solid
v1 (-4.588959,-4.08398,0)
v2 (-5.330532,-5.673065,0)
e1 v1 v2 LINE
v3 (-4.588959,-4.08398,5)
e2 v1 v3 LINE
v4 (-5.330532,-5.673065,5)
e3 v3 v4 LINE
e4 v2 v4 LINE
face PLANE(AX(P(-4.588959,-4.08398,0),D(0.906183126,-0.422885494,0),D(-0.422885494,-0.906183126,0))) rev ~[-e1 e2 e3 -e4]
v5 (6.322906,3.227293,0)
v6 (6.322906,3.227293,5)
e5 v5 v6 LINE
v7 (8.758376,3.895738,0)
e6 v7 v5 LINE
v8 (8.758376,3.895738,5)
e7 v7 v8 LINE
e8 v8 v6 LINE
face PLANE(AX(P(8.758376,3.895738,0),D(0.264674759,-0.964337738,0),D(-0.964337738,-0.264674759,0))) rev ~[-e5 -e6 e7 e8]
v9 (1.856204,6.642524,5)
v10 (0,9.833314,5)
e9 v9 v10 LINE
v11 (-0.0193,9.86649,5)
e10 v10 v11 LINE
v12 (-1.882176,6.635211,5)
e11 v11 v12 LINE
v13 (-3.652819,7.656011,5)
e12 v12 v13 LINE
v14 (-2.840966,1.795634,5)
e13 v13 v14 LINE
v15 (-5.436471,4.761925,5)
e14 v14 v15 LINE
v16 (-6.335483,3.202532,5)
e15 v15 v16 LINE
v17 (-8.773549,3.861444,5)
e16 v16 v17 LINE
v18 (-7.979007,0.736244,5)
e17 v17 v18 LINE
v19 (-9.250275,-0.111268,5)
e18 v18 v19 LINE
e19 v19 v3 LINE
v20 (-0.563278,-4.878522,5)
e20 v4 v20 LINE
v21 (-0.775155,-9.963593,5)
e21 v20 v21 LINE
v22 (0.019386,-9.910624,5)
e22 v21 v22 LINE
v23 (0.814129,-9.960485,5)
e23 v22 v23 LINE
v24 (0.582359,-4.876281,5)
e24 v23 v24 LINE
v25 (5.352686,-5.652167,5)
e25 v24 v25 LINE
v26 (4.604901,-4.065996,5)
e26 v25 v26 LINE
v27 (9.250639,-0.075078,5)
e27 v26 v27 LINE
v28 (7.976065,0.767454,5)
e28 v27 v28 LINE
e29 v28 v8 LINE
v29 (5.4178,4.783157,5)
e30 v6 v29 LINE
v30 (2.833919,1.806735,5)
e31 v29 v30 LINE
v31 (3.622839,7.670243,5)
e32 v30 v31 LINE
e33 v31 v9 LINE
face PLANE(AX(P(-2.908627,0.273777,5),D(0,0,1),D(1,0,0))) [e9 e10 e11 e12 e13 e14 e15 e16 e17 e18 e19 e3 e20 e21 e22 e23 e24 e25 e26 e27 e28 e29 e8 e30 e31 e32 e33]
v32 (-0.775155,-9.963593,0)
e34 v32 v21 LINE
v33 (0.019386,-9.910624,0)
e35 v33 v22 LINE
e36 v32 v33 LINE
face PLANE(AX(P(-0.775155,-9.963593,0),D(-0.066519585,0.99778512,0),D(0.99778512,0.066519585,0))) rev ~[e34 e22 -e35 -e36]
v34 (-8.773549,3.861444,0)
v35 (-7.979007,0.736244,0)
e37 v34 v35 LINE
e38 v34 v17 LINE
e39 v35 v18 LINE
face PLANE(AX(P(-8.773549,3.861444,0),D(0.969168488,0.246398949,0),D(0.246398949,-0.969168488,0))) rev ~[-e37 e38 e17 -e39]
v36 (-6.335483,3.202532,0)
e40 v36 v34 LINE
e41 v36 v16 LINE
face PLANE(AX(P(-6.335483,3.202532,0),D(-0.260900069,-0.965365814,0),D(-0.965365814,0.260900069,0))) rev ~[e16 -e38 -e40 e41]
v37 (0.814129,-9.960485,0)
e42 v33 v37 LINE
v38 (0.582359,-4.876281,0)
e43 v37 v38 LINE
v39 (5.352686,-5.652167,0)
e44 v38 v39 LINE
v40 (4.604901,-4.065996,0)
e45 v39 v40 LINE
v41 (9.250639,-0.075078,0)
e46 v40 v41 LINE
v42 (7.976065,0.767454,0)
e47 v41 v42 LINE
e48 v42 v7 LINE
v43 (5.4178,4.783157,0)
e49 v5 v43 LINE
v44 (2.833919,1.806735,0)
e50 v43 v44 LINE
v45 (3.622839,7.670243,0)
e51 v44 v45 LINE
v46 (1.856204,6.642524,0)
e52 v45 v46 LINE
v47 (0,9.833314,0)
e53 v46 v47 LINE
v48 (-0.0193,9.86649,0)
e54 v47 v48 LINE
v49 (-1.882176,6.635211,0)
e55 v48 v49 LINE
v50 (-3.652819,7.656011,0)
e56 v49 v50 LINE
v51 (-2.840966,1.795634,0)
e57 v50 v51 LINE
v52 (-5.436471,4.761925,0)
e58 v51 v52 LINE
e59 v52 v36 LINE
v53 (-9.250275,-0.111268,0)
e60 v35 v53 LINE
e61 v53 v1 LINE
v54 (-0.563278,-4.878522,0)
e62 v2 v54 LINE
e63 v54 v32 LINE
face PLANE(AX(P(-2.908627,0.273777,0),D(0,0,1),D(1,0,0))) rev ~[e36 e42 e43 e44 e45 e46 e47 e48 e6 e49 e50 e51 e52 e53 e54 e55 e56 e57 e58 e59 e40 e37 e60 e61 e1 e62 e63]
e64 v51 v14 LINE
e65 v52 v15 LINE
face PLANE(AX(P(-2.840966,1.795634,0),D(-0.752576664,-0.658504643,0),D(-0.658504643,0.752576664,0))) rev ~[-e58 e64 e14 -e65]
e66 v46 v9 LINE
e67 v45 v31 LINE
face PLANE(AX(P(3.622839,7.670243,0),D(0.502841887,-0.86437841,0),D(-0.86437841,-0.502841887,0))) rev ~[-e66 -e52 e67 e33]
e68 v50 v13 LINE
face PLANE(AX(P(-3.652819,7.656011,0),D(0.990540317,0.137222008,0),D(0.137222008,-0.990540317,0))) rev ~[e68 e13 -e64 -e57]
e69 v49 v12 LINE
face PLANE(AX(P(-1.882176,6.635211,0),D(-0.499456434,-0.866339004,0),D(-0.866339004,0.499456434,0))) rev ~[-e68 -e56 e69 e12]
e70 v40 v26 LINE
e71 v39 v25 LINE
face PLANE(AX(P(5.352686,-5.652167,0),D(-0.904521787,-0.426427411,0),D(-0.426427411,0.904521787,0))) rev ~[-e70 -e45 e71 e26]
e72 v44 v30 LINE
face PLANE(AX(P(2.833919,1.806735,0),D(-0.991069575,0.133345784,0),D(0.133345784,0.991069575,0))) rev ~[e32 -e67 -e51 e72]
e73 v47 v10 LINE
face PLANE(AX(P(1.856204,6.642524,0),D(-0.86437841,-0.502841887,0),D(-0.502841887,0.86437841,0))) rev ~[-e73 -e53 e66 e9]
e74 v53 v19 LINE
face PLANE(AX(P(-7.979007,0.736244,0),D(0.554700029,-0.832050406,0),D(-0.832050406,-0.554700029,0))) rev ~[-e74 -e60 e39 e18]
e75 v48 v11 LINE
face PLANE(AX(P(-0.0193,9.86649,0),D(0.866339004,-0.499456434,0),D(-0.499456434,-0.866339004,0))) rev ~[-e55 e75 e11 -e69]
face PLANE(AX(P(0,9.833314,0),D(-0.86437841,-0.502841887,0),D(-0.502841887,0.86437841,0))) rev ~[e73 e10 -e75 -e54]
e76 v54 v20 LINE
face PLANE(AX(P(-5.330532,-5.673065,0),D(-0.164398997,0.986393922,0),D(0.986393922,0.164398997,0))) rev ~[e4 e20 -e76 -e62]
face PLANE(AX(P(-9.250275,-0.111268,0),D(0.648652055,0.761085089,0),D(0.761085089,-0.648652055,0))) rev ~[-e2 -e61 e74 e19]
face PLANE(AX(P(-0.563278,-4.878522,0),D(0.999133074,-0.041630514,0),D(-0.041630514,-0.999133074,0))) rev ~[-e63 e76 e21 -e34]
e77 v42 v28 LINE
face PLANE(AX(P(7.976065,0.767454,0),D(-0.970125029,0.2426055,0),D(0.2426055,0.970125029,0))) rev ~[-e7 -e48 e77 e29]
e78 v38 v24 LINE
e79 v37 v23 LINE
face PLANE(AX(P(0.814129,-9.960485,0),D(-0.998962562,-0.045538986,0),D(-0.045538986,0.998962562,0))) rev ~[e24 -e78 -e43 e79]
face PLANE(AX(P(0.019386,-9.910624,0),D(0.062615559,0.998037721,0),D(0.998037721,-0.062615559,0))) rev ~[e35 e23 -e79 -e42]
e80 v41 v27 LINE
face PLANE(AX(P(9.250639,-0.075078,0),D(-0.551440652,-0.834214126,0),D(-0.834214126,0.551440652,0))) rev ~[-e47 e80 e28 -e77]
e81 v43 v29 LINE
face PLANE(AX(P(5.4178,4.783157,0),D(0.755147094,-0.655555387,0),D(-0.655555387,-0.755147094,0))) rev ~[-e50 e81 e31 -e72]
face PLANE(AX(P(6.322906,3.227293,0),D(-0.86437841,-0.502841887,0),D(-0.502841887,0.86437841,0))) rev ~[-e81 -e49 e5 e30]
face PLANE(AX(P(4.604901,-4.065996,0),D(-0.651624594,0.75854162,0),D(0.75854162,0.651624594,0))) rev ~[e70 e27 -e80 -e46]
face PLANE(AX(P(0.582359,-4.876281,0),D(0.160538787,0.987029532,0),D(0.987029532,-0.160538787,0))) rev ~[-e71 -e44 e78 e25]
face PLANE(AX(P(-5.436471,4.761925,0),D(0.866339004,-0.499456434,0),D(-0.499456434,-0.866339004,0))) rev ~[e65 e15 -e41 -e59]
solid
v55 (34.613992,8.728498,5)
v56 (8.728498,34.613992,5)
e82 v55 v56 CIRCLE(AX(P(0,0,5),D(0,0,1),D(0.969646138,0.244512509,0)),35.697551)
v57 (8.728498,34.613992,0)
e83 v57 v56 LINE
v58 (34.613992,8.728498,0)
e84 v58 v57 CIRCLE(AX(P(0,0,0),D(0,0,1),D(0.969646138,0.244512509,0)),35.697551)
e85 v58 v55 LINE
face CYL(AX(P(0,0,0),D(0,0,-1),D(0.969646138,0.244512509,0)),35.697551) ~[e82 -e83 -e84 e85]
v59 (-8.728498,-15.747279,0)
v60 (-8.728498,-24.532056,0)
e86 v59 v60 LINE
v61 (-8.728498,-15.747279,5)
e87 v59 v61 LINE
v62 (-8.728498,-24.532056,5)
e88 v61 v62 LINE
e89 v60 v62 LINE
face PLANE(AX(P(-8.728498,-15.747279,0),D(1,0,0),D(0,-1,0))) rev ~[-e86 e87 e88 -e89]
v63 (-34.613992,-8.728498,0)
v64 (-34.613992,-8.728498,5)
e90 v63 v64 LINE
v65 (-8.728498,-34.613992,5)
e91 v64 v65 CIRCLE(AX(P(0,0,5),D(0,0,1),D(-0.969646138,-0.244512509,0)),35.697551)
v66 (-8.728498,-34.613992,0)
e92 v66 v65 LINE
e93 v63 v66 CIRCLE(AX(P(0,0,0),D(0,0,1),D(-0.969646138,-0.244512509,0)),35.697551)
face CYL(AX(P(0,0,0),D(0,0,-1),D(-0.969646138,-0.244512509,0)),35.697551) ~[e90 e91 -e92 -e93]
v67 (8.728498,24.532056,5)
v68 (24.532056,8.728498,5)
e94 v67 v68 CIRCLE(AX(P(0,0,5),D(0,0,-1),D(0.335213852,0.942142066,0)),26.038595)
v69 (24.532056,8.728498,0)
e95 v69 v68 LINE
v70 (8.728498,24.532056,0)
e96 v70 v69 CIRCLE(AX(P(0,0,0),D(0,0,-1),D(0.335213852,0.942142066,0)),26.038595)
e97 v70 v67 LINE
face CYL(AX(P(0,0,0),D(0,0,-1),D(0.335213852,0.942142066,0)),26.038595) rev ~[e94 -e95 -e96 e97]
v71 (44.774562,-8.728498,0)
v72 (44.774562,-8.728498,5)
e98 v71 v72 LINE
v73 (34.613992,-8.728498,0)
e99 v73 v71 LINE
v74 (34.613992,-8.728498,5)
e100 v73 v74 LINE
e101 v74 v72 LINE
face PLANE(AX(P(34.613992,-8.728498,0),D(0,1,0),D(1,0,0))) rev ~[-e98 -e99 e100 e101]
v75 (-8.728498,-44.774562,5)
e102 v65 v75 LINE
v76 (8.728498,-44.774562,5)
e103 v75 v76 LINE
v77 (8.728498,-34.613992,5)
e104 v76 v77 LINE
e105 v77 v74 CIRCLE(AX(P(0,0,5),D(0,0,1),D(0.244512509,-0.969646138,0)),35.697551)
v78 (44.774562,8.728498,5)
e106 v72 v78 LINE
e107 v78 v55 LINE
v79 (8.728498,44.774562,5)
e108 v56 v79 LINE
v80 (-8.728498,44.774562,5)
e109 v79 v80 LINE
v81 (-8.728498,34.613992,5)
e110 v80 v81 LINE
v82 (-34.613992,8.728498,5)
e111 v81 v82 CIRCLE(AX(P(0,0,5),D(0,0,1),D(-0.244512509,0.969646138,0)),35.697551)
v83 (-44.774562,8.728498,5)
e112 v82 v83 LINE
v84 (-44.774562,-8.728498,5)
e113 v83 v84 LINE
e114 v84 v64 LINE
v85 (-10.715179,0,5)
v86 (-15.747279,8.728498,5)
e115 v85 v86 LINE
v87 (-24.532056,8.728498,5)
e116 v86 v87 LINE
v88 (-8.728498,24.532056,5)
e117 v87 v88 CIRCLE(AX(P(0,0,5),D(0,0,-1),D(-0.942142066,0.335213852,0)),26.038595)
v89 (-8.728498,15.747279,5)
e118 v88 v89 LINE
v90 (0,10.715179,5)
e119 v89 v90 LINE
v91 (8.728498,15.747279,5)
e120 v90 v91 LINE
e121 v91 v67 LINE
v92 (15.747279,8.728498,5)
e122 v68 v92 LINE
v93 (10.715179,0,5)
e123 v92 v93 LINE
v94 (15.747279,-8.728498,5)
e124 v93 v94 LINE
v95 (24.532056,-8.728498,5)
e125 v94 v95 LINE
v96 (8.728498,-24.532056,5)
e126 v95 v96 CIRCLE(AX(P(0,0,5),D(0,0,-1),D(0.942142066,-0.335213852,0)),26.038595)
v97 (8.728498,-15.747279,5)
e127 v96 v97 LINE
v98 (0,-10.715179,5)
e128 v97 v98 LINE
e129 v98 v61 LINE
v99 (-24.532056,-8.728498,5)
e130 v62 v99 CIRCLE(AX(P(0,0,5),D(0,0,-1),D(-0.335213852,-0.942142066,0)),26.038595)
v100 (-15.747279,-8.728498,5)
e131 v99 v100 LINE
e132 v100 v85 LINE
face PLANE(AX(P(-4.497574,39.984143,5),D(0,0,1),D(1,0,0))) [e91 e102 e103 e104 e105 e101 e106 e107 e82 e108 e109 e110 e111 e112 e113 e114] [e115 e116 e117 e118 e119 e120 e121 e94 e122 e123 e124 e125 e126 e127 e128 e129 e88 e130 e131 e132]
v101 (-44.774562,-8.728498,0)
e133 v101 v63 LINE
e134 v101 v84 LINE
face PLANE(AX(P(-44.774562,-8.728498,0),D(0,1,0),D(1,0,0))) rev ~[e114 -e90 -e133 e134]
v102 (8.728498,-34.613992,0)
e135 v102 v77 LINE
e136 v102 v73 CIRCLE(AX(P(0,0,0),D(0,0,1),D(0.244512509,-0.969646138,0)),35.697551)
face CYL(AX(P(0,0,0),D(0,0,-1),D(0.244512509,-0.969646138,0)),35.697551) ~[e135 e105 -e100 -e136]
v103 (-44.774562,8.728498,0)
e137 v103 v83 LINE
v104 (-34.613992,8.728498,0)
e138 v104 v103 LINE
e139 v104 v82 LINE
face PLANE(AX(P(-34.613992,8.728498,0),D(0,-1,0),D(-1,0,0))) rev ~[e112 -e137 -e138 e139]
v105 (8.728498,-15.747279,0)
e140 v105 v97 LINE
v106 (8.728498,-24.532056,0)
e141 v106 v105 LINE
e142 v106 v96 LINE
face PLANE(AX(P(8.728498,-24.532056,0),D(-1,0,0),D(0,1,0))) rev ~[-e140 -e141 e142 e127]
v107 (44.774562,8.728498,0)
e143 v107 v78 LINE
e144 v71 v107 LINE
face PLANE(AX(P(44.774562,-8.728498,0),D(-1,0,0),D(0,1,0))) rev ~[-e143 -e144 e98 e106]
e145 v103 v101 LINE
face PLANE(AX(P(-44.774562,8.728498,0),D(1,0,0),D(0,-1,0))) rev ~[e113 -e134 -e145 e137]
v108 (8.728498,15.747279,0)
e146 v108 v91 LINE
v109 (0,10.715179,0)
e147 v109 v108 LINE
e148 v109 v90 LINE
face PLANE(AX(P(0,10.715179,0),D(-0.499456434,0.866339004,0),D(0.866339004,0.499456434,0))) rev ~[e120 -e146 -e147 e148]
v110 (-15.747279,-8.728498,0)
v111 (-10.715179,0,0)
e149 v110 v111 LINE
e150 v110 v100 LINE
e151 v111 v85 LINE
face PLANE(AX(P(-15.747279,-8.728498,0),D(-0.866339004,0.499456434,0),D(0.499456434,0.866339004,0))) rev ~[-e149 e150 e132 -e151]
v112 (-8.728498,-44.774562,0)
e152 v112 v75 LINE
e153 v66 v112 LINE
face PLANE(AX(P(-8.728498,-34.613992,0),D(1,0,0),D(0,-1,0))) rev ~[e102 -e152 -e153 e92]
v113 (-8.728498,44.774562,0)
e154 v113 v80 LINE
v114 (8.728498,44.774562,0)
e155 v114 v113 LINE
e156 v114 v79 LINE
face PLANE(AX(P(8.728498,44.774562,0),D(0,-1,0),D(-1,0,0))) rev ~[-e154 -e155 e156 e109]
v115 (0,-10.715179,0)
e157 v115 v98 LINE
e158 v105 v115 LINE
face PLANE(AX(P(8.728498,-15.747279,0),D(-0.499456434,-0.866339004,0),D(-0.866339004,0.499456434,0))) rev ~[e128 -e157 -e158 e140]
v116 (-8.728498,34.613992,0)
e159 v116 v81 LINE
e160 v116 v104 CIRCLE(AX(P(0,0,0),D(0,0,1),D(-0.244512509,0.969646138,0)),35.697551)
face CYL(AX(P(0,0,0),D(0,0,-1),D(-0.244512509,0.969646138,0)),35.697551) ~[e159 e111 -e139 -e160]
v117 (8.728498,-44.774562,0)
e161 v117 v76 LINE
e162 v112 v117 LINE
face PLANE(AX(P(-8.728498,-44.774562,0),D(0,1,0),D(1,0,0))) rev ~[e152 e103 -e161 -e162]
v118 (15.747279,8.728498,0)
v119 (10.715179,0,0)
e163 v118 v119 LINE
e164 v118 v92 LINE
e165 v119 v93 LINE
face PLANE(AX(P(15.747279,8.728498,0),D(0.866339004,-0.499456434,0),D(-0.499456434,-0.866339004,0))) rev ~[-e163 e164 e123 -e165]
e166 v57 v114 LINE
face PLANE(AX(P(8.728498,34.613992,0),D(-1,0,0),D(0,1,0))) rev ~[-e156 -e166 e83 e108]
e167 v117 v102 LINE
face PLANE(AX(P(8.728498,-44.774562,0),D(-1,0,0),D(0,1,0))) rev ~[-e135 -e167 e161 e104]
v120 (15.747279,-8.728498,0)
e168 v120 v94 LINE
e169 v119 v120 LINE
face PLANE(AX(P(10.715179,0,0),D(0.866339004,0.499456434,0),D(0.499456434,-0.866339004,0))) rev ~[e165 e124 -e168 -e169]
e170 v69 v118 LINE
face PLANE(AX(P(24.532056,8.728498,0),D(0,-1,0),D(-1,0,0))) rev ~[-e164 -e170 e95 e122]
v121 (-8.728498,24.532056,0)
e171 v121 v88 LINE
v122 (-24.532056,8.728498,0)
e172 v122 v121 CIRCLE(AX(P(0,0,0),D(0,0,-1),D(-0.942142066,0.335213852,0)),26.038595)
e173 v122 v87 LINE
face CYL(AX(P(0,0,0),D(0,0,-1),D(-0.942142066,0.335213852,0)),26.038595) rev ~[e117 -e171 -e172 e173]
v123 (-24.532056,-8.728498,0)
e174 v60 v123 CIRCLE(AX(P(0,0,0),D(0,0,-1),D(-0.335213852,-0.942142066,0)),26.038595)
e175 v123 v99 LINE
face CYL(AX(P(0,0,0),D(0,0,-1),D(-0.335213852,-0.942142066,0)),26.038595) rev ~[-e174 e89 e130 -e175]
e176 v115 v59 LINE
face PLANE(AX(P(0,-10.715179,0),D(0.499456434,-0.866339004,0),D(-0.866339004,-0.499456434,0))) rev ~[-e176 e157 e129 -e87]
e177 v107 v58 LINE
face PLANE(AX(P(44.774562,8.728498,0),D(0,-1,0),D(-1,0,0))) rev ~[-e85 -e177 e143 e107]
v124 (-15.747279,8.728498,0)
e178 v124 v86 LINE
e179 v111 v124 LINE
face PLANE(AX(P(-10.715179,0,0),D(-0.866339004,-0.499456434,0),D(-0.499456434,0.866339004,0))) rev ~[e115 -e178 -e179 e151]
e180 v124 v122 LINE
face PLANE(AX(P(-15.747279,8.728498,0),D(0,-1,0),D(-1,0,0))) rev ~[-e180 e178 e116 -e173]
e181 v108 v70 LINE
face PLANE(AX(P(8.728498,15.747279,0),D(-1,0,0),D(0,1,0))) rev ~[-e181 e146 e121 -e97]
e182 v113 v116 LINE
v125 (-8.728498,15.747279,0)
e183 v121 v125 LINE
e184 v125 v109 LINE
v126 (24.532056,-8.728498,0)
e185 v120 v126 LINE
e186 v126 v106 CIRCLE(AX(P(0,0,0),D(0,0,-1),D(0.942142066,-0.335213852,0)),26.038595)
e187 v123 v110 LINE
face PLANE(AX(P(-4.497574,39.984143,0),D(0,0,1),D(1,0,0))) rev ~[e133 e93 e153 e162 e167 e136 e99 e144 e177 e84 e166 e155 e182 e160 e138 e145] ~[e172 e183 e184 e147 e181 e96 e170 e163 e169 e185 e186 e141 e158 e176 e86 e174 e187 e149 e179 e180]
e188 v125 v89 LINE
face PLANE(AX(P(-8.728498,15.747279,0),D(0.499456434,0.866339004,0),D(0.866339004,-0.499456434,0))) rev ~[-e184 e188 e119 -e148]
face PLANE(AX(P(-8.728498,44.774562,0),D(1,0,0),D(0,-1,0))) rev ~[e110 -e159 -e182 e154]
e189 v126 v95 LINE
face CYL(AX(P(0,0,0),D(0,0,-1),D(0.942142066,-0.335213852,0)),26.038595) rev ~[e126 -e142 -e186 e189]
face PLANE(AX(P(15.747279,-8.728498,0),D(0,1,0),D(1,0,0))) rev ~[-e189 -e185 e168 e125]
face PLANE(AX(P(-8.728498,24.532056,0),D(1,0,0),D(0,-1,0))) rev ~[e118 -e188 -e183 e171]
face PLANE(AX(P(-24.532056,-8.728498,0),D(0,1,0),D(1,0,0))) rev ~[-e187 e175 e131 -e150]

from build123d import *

# Parameters (mm, degrees)
F1_DEPTH = 5


with BuildPart() as f1:
    # F0 (on Top) → F1 (new body)
    with BuildSketch(Plane.XY):
        with BuildLine():
            Line((-8.7284976617, 44.7745621204), (-8.7284976617, 34.6139920432))
            ThreePointArc((-8.7284976617, 34.6139920432), (-4.3977485861, 35.4256252446), (0, 35.6975505686))
            Line((0, 35.6975505686), (0, 44.7745621204))
            Line((0, 44.7745621204), (-8.7284976617, 44.7745621204))
        make_face()
        with BuildLine():
            Line((0, 44.7745621204), (0, 35.6975505686))
            ThreePointArc((0, 35.6975505686), (4.3977485861, 35.4256252446), (8.7284976617, 34.6139920432))
            Line((8.7284976617, 34.6139920432), (8.7284976617, 44.7745621204))
            Line((8.7284976617, 44.7745621204), (0, 44.7745621204))
        make_face()
        with BuildLine():
            ThreePointArc((8.7284976617, 34.6139920432), (4.3977485861, 35.4256252446), (0, 35.6975505686))
            Line((0, 35.6975505686), (0, 26.0385947902))
            ThreePointArc((0, 26.0385947902), (4.4287789528, 25.6591959273), (8.7284976616, 24.5320555033))
            Line((8.7284976617, 24.5320555033), (8.7284976617, 34.6139920432))
        make_face()
        with BuildLine():
            ThreePointArc((0, 35.6975505686), (-4.3977485861, 35.4256252446), (-8.7284976617, 34.6139920432))
            Line((-8.7284976617, 34.6139920432), (-8.7284976617, 24.5320555033))
            ThreePointArc((-8.7284976616, 24.5320555033), (-4.4287789528, 25.6591959273), (0, 26.0385947902))
            Line((0, 26.0385947902), (0, 35.6975505686))
        make_face()
        with BuildLine():
            ThreePointArc((0, 26.0385947902), (-4.4287789528, 25.6591959273), (-8.7284976616, 24.5320555033))
            Line((-8.7284976617, 24.5320555033), (-8.7284976617, 15.7472789288))
            Line((-8.7284976617, 15.7472789288), (0, 10.7151791453))
            Line((0, 10.7151791453), (0, 26.0385947902))
        make_face()
        with BuildLine():
            ThreePointArc((8.7284976616, 24.5320555033), (4.4287789528, 25.6591959273), (0, 26.0385947902))
            Line((0, 26.0385947902), (0, 10.7151791453))
            Line((0, 10.7151791453), (8.7284976617, 15.7472789288))
            Line((8.7284976617, 15.7472789288), (8.7284976617, 24.5320555033))
        make_face()
        with BuildLine():
            Line((15.7472789288, -8.7284976617), (24.5320555033, -8.7284976617))
            ThreePointArc((24.5320555033, -8.7284976617), (25.6591959273, -4.4287789528), (26.0385947902, 0))
            Line((26.0385947902, 0), (10.7151791453, 0))
            Line((10.7151791453, 0), (15.7472789288, -8.7284976617))
        make_face()
        with BuildLine():
            ThreePointArc((26.0385947902, 0), (25.6591959273, 4.4287789528), (24.5320555033, 8.7284976616))
            Line((24.5320555033, 8.7284976617), (15.7472789288, 8.7284976617))
            Line((15.7472789288, 8.7284976617), (10.7151791453, 0))
            Line((10.7151791453, 0), (26.0385947902, 0))
        make_face()
        with BuildLine():
            ThreePointArc((35.6975505686, 0), (35.4256252446, 4.3977485861), (34.6139920432, 8.7284976616))
            Line((34.6139920432, 8.7284976617), (24.5320555033, 8.7284976617))
            ThreePointArc((24.5320555033, 8.7284976616), (25.6591959273, 4.4287789528), (26.0385947902, 0))
            Line((26.0385947902, 0), (35.6975505686, 0))
        make_face()
        with BuildLine():
            Line((24.5320555033, -8.7284976617), (34.6139920432, -8.7284976617))
            ThreePointArc((34.6139920432, -8.7284976616), (35.4256252446, -4.3977485861), (35.6975505686, 0))
            Line((35.6975505686, 0), (26.0385947902, 0))
            ThreePointArc((26.0385947902, 0), (25.6591959273, -4.4287789528), (24.5320555033, -8.7284976617))
        make_face()
        with BuildLine():
            ThreePointArc((35.6975505686, 0), (35.4256252446, -4.3977485861), (34.6139920432, -8.7284976616))
            Line((34.6139920432, -8.7284976617), (44.7745621204, -8.7284976617))
            Line((44.7745621204, -8.7284976617), (44.7745621204, 0))
            Line((44.7745621204, 0), (35.6975505686, 0))
        make_face()
        with BuildLine():
            Line((44.7745621204, 8.7284976617), (34.6139920432, 8.7284976617))
            ThreePointArc((34.6139920432, 8.7284976616), (35.4256252446, 4.3977485861), (35.6975505686, 0))
            Line((35.6975505686, 0), (44.7745621204, 0))
            Line((44.7745621204, 0), (44.7745621204, 8.7284976617))
        make_face()
        with BuildLine():
            ThreePointArc((34.6139920432, 8.7284976616), (25.2419800788, 25.2419800788), (8.7284976617, 34.6139920432))
            Line((8.7284976617, 34.6139920432), (8.7284976617, 24.5320555033))
            ThreePointArc((8.7284976616, 24.5320555033), (18.4120669487, 18.4120669487), (24.5320555033, 8.7284976616))
            Line((24.5320555033, 8.7284976617), (34.6139920432, 8.7284976617))
        make_face()
        with BuildLine():
            ThreePointArc((-8.7284976617, 34.6139920432), (-25.2419800788, 25.2419800788), (-34.6139920432, 8.7284976616))
            Line((-34.6139920432, 8.7284976617), (-24.5320555033, 8.7284976617))
            ThreePointArc((-24.5320555033, 8.7284976616), (-18.4120669487, 18.4120669487), (-8.7284976616, 24.5320555033))
            Line((-8.7284976617, 24.5320555033), (-8.7284976617, 34.6139920432))
        make_face()
        with BuildLine():
            ThreePointArc((-34.6139920432, 8.7284976616), (-35.4256252446, 4.3977485861), (-35.6975505686, 0))
            Line((-35.6975505686, 0), (-26.0385947902, 0))
            ThreePointArc((-26.0385947902, 0), (-25.6591959273, 4.4287789528), (-24.5320555033, 8.7284976616))
            Line((-24.5320555033, 8.7284976617), (-34.6139920432, 8.7284976617))
        make_face()
        with BuildLine():
            ThreePointArc((-24.5320555033, 8.7284976616), (-25.6591959273, 4.4287789528), (-26.0385947902, 0))
            Line((-26.0385947902, 0), (-10.7151791453, 0))
            Line((-10.7151791453, 0), (-15.7472789288, 8.7284976617))
            Line((-15.7472789288, 8.7284976617), (-24.5320555033, 8.7284976617))
        make_face()
        with BuildLine():
            Line((-10.7151791453, 0), (-26.0385947902, 0))
            ThreePointArc((-26.0385947902, 0), (-25.6591959273, -4.4287789528), (-24.5320555033, -8.7284976616))
            Line((-24.5320555033, -8.7284976617), (-15.7472789288, -8.7284976617))
            Line((-15.7472789288, -8.7284976617), (-10.7151791453, 0))
        make_face()
        with BuildLine():
            Line((-26.0385947902, 0), (-35.6975505686, 0))
            ThreePointArc((-35.6975505686, 0), (-35.4256252446, -4.3977485861), (-34.6139920432, -8.7284976616))
            Line((-34.6139920432, -8.7284976617), (-24.5320555033, -8.7284976617))
            ThreePointArc((-24.5320555033, -8.7284976616), (-25.6591959273, -4.4287789528), (-26.0385947902, 0))
        make_face()
        with BuildLine():
            Line((-35.6975505686, 0), (-44.7745621204, 0))
            Line((-44.7745621204, 0), (-44.7745621204, -8.7284976617))
            Line((-44.7745621204, -8.7284976617), (-34.6139920432, -8.7284976617))
            ThreePointArc((-34.6139920432, -8.7284976616), (-35.4256252446, -4.3977485861), (-35.6975505686, 0))
        make_face()
        with BuildLine():
            Line((-44.7745621204, 8.7284976617), (-44.7745621204, 0))
            Line((-44.7745621204, 0), (-35.6975505686, 0))
            ThreePointArc((-35.6975505686, 0), (-35.4256252446, 4.3977485861), (-34.6139920432, 8.7284976616))
            Line((-34.6139920432, 8.7284976617), (-44.7745621204, 8.7284976617))
        make_face()
        with BuildLine():
            Line((-24.5320555033, -8.7284976617), (-34.6139920432, -8.7284976617))
            ThreePointArc((-34.6139920432, -8.7284976616), (-25.2419800788, -25.2419800788), (-8.7284976617, -34.6139920432))
            Line((-8.7284976617, -34.6139920432), (-8.7284976617, -24.5320555033))
            ThreePointArc((-8.7284976616, -24.5320555033), (-18.4120669487, -18.4120669487), (-24.5320555033, -8.7284976616))
        make_face()
        with BuildLine():
            Line((-8.7284976617, -24.5320555033), (-8.7284976617, -34.6139920432))
            ThreePointArc((-8.7284976617, -34.6139920432), (-4.3977485861, -35.4256252446), (0, -35.6975505686))
            Line((0, -35.6975505686), (0, -26.0385947902))
            ThreePointArc((0, -26.0385947902), (-4.4287789528, -25.6591959273), (-8.7284976616, -24.5320555033))
        make_face()
        with BuildLine():
            Line((-8.7284976617, -15.7472789288), (-8.7284976617, -24.5320555033))
            ThreePointArc((-8.7284976616, -24.5320555033), (-4.4287789528, -25.6591959273), (0, -26.0385947902))
            Line((0, -26.0385947902), (0, -10.7151791453))
            Line((0, -10.7151791453), (-8.7284976617, -15.7472789288))
        make_face()
        with BuildLine():
            Line((0, -10.7151791453), (0, -26.0385947902))
            ThreePointArc((0, -26.0385947902), (4.4287789528, -25.6591959273), (8.7284976616, -24.5320555033))
            Line((8.7284976617, -24.5320555033), (8.7284976617, -15.7472789288))
            Line((8.7284976617, -15.7472789288), (0, -10.7151791453))
        make_face()
        with BuildLine():
            Line((0, -26.0385947902), (0, -35.6975505686))
            ThreePointArc((0, -35.6975505686), (4.3977485861, -35.4256252446), (8.7284976617, -34.6139920432))
            Line((8.7284976617, -34.6139920432), (8.7284976617, -24.5320555033))
            ThreePointArc((8.7284976616, -24.5320555033), (4.4287789528, -25.6591959273), (0, -26.0385947902))
        make_face()
        with BuildLine():
            Line((8.7284976617, -24.5320555033), (8.7284976617, -34.6139920432))
            ThreePointArc((8.7284976617, -34.6139920432), (25.2419800788, -25.2419800788), (34.6139920432, -8.7284976616))
            Line((34.6139920432, -8.7284976617), (24.5320555033, -8.7284976617))
            ThreePointArc((24.5320555033, -8.7284976617), (18.4120669487, -18.4120669487), (8.7284976616, -24.5320555033))
        make_face()
        with BuildLine():
            ThreePointArc((8.7284976617, -34.6139920432), (4.3977485861, -35.4256252446), (0, -35.6975505686))
            Line((0, -35.6975505686), (0, -44.7745621204))
            Line((0, -44.7745621204), (8.7284976617, -44.7745621204))
            Line((8.7284976617, -44.7745621204), (8.7284976617, -34.6139920432))
        make_face()
        with BuildLine():
            ThreePointArc((0, -35.6975505686), (-4.3977485861, -35.4256252446), (-8.7284976617, -34.6139920432))
            Line((-8.7284976617, -34.6139920432), (-8.7284976617, -44.7745621204))
            Line((-8.7284976617, -44.7745621204), (0, -44.7745621204))
            Line((0, -44.7745621204), (0, -35.6975505686))
        make_face()
    extrude(amount=F1_DEPTH)


with BuildPart() as f1b:
    # F0 (on Top) → F1, piece 2 (new body)
    with BuildSketch(Plane.XY):
        Polygon((0.0193861542, -9.910623543), (0, 0), (0, 9.8333135078), (-0.019299824, 9.8664896445), (-1.8821764336, 6.6352114842), (-3.652818574, 7.6560111999), (-2.8409659863, 1.7956340453), (-5.4364711978, 4.7619254328), (-6.3354833617, 3.2025315598), (-8.7735494599, 3.8614440709), (-7.9790065065, 0.7362440811), (-9.2502748594, -0.1112677855), (-4.588959273, -4.0839798748), (-5.3305323236, -5.6730648503), (-0.5632776883, -4.8785223626), (-0.7751554949, -9.9635934457), align=None)
        Polygon((0, 9.8333135078), (0, 0), (0.0193861542, -9.910623543), (0.814128951, -9.9604846491), (0.5823590437, -4.8762813845), (5.3526855916, -5.6521674255), (4.6049014268, -4.0659957792), (9.2506393704, -0.075078178), (7.9760651256, 0.7674537701), (8.7583756485, 3.8957382405), (6.3229059933, 3.2272926142), (5.417800077, 4.7831574548), (2.8339193988, 1.8067346791), (3.6228389134, 7.6702431014), (1.856203877, 6.6425241237), align=None)
    extrude(amount=F1_DEPTH)


solid = Compound([f1.part, f1b.part])
